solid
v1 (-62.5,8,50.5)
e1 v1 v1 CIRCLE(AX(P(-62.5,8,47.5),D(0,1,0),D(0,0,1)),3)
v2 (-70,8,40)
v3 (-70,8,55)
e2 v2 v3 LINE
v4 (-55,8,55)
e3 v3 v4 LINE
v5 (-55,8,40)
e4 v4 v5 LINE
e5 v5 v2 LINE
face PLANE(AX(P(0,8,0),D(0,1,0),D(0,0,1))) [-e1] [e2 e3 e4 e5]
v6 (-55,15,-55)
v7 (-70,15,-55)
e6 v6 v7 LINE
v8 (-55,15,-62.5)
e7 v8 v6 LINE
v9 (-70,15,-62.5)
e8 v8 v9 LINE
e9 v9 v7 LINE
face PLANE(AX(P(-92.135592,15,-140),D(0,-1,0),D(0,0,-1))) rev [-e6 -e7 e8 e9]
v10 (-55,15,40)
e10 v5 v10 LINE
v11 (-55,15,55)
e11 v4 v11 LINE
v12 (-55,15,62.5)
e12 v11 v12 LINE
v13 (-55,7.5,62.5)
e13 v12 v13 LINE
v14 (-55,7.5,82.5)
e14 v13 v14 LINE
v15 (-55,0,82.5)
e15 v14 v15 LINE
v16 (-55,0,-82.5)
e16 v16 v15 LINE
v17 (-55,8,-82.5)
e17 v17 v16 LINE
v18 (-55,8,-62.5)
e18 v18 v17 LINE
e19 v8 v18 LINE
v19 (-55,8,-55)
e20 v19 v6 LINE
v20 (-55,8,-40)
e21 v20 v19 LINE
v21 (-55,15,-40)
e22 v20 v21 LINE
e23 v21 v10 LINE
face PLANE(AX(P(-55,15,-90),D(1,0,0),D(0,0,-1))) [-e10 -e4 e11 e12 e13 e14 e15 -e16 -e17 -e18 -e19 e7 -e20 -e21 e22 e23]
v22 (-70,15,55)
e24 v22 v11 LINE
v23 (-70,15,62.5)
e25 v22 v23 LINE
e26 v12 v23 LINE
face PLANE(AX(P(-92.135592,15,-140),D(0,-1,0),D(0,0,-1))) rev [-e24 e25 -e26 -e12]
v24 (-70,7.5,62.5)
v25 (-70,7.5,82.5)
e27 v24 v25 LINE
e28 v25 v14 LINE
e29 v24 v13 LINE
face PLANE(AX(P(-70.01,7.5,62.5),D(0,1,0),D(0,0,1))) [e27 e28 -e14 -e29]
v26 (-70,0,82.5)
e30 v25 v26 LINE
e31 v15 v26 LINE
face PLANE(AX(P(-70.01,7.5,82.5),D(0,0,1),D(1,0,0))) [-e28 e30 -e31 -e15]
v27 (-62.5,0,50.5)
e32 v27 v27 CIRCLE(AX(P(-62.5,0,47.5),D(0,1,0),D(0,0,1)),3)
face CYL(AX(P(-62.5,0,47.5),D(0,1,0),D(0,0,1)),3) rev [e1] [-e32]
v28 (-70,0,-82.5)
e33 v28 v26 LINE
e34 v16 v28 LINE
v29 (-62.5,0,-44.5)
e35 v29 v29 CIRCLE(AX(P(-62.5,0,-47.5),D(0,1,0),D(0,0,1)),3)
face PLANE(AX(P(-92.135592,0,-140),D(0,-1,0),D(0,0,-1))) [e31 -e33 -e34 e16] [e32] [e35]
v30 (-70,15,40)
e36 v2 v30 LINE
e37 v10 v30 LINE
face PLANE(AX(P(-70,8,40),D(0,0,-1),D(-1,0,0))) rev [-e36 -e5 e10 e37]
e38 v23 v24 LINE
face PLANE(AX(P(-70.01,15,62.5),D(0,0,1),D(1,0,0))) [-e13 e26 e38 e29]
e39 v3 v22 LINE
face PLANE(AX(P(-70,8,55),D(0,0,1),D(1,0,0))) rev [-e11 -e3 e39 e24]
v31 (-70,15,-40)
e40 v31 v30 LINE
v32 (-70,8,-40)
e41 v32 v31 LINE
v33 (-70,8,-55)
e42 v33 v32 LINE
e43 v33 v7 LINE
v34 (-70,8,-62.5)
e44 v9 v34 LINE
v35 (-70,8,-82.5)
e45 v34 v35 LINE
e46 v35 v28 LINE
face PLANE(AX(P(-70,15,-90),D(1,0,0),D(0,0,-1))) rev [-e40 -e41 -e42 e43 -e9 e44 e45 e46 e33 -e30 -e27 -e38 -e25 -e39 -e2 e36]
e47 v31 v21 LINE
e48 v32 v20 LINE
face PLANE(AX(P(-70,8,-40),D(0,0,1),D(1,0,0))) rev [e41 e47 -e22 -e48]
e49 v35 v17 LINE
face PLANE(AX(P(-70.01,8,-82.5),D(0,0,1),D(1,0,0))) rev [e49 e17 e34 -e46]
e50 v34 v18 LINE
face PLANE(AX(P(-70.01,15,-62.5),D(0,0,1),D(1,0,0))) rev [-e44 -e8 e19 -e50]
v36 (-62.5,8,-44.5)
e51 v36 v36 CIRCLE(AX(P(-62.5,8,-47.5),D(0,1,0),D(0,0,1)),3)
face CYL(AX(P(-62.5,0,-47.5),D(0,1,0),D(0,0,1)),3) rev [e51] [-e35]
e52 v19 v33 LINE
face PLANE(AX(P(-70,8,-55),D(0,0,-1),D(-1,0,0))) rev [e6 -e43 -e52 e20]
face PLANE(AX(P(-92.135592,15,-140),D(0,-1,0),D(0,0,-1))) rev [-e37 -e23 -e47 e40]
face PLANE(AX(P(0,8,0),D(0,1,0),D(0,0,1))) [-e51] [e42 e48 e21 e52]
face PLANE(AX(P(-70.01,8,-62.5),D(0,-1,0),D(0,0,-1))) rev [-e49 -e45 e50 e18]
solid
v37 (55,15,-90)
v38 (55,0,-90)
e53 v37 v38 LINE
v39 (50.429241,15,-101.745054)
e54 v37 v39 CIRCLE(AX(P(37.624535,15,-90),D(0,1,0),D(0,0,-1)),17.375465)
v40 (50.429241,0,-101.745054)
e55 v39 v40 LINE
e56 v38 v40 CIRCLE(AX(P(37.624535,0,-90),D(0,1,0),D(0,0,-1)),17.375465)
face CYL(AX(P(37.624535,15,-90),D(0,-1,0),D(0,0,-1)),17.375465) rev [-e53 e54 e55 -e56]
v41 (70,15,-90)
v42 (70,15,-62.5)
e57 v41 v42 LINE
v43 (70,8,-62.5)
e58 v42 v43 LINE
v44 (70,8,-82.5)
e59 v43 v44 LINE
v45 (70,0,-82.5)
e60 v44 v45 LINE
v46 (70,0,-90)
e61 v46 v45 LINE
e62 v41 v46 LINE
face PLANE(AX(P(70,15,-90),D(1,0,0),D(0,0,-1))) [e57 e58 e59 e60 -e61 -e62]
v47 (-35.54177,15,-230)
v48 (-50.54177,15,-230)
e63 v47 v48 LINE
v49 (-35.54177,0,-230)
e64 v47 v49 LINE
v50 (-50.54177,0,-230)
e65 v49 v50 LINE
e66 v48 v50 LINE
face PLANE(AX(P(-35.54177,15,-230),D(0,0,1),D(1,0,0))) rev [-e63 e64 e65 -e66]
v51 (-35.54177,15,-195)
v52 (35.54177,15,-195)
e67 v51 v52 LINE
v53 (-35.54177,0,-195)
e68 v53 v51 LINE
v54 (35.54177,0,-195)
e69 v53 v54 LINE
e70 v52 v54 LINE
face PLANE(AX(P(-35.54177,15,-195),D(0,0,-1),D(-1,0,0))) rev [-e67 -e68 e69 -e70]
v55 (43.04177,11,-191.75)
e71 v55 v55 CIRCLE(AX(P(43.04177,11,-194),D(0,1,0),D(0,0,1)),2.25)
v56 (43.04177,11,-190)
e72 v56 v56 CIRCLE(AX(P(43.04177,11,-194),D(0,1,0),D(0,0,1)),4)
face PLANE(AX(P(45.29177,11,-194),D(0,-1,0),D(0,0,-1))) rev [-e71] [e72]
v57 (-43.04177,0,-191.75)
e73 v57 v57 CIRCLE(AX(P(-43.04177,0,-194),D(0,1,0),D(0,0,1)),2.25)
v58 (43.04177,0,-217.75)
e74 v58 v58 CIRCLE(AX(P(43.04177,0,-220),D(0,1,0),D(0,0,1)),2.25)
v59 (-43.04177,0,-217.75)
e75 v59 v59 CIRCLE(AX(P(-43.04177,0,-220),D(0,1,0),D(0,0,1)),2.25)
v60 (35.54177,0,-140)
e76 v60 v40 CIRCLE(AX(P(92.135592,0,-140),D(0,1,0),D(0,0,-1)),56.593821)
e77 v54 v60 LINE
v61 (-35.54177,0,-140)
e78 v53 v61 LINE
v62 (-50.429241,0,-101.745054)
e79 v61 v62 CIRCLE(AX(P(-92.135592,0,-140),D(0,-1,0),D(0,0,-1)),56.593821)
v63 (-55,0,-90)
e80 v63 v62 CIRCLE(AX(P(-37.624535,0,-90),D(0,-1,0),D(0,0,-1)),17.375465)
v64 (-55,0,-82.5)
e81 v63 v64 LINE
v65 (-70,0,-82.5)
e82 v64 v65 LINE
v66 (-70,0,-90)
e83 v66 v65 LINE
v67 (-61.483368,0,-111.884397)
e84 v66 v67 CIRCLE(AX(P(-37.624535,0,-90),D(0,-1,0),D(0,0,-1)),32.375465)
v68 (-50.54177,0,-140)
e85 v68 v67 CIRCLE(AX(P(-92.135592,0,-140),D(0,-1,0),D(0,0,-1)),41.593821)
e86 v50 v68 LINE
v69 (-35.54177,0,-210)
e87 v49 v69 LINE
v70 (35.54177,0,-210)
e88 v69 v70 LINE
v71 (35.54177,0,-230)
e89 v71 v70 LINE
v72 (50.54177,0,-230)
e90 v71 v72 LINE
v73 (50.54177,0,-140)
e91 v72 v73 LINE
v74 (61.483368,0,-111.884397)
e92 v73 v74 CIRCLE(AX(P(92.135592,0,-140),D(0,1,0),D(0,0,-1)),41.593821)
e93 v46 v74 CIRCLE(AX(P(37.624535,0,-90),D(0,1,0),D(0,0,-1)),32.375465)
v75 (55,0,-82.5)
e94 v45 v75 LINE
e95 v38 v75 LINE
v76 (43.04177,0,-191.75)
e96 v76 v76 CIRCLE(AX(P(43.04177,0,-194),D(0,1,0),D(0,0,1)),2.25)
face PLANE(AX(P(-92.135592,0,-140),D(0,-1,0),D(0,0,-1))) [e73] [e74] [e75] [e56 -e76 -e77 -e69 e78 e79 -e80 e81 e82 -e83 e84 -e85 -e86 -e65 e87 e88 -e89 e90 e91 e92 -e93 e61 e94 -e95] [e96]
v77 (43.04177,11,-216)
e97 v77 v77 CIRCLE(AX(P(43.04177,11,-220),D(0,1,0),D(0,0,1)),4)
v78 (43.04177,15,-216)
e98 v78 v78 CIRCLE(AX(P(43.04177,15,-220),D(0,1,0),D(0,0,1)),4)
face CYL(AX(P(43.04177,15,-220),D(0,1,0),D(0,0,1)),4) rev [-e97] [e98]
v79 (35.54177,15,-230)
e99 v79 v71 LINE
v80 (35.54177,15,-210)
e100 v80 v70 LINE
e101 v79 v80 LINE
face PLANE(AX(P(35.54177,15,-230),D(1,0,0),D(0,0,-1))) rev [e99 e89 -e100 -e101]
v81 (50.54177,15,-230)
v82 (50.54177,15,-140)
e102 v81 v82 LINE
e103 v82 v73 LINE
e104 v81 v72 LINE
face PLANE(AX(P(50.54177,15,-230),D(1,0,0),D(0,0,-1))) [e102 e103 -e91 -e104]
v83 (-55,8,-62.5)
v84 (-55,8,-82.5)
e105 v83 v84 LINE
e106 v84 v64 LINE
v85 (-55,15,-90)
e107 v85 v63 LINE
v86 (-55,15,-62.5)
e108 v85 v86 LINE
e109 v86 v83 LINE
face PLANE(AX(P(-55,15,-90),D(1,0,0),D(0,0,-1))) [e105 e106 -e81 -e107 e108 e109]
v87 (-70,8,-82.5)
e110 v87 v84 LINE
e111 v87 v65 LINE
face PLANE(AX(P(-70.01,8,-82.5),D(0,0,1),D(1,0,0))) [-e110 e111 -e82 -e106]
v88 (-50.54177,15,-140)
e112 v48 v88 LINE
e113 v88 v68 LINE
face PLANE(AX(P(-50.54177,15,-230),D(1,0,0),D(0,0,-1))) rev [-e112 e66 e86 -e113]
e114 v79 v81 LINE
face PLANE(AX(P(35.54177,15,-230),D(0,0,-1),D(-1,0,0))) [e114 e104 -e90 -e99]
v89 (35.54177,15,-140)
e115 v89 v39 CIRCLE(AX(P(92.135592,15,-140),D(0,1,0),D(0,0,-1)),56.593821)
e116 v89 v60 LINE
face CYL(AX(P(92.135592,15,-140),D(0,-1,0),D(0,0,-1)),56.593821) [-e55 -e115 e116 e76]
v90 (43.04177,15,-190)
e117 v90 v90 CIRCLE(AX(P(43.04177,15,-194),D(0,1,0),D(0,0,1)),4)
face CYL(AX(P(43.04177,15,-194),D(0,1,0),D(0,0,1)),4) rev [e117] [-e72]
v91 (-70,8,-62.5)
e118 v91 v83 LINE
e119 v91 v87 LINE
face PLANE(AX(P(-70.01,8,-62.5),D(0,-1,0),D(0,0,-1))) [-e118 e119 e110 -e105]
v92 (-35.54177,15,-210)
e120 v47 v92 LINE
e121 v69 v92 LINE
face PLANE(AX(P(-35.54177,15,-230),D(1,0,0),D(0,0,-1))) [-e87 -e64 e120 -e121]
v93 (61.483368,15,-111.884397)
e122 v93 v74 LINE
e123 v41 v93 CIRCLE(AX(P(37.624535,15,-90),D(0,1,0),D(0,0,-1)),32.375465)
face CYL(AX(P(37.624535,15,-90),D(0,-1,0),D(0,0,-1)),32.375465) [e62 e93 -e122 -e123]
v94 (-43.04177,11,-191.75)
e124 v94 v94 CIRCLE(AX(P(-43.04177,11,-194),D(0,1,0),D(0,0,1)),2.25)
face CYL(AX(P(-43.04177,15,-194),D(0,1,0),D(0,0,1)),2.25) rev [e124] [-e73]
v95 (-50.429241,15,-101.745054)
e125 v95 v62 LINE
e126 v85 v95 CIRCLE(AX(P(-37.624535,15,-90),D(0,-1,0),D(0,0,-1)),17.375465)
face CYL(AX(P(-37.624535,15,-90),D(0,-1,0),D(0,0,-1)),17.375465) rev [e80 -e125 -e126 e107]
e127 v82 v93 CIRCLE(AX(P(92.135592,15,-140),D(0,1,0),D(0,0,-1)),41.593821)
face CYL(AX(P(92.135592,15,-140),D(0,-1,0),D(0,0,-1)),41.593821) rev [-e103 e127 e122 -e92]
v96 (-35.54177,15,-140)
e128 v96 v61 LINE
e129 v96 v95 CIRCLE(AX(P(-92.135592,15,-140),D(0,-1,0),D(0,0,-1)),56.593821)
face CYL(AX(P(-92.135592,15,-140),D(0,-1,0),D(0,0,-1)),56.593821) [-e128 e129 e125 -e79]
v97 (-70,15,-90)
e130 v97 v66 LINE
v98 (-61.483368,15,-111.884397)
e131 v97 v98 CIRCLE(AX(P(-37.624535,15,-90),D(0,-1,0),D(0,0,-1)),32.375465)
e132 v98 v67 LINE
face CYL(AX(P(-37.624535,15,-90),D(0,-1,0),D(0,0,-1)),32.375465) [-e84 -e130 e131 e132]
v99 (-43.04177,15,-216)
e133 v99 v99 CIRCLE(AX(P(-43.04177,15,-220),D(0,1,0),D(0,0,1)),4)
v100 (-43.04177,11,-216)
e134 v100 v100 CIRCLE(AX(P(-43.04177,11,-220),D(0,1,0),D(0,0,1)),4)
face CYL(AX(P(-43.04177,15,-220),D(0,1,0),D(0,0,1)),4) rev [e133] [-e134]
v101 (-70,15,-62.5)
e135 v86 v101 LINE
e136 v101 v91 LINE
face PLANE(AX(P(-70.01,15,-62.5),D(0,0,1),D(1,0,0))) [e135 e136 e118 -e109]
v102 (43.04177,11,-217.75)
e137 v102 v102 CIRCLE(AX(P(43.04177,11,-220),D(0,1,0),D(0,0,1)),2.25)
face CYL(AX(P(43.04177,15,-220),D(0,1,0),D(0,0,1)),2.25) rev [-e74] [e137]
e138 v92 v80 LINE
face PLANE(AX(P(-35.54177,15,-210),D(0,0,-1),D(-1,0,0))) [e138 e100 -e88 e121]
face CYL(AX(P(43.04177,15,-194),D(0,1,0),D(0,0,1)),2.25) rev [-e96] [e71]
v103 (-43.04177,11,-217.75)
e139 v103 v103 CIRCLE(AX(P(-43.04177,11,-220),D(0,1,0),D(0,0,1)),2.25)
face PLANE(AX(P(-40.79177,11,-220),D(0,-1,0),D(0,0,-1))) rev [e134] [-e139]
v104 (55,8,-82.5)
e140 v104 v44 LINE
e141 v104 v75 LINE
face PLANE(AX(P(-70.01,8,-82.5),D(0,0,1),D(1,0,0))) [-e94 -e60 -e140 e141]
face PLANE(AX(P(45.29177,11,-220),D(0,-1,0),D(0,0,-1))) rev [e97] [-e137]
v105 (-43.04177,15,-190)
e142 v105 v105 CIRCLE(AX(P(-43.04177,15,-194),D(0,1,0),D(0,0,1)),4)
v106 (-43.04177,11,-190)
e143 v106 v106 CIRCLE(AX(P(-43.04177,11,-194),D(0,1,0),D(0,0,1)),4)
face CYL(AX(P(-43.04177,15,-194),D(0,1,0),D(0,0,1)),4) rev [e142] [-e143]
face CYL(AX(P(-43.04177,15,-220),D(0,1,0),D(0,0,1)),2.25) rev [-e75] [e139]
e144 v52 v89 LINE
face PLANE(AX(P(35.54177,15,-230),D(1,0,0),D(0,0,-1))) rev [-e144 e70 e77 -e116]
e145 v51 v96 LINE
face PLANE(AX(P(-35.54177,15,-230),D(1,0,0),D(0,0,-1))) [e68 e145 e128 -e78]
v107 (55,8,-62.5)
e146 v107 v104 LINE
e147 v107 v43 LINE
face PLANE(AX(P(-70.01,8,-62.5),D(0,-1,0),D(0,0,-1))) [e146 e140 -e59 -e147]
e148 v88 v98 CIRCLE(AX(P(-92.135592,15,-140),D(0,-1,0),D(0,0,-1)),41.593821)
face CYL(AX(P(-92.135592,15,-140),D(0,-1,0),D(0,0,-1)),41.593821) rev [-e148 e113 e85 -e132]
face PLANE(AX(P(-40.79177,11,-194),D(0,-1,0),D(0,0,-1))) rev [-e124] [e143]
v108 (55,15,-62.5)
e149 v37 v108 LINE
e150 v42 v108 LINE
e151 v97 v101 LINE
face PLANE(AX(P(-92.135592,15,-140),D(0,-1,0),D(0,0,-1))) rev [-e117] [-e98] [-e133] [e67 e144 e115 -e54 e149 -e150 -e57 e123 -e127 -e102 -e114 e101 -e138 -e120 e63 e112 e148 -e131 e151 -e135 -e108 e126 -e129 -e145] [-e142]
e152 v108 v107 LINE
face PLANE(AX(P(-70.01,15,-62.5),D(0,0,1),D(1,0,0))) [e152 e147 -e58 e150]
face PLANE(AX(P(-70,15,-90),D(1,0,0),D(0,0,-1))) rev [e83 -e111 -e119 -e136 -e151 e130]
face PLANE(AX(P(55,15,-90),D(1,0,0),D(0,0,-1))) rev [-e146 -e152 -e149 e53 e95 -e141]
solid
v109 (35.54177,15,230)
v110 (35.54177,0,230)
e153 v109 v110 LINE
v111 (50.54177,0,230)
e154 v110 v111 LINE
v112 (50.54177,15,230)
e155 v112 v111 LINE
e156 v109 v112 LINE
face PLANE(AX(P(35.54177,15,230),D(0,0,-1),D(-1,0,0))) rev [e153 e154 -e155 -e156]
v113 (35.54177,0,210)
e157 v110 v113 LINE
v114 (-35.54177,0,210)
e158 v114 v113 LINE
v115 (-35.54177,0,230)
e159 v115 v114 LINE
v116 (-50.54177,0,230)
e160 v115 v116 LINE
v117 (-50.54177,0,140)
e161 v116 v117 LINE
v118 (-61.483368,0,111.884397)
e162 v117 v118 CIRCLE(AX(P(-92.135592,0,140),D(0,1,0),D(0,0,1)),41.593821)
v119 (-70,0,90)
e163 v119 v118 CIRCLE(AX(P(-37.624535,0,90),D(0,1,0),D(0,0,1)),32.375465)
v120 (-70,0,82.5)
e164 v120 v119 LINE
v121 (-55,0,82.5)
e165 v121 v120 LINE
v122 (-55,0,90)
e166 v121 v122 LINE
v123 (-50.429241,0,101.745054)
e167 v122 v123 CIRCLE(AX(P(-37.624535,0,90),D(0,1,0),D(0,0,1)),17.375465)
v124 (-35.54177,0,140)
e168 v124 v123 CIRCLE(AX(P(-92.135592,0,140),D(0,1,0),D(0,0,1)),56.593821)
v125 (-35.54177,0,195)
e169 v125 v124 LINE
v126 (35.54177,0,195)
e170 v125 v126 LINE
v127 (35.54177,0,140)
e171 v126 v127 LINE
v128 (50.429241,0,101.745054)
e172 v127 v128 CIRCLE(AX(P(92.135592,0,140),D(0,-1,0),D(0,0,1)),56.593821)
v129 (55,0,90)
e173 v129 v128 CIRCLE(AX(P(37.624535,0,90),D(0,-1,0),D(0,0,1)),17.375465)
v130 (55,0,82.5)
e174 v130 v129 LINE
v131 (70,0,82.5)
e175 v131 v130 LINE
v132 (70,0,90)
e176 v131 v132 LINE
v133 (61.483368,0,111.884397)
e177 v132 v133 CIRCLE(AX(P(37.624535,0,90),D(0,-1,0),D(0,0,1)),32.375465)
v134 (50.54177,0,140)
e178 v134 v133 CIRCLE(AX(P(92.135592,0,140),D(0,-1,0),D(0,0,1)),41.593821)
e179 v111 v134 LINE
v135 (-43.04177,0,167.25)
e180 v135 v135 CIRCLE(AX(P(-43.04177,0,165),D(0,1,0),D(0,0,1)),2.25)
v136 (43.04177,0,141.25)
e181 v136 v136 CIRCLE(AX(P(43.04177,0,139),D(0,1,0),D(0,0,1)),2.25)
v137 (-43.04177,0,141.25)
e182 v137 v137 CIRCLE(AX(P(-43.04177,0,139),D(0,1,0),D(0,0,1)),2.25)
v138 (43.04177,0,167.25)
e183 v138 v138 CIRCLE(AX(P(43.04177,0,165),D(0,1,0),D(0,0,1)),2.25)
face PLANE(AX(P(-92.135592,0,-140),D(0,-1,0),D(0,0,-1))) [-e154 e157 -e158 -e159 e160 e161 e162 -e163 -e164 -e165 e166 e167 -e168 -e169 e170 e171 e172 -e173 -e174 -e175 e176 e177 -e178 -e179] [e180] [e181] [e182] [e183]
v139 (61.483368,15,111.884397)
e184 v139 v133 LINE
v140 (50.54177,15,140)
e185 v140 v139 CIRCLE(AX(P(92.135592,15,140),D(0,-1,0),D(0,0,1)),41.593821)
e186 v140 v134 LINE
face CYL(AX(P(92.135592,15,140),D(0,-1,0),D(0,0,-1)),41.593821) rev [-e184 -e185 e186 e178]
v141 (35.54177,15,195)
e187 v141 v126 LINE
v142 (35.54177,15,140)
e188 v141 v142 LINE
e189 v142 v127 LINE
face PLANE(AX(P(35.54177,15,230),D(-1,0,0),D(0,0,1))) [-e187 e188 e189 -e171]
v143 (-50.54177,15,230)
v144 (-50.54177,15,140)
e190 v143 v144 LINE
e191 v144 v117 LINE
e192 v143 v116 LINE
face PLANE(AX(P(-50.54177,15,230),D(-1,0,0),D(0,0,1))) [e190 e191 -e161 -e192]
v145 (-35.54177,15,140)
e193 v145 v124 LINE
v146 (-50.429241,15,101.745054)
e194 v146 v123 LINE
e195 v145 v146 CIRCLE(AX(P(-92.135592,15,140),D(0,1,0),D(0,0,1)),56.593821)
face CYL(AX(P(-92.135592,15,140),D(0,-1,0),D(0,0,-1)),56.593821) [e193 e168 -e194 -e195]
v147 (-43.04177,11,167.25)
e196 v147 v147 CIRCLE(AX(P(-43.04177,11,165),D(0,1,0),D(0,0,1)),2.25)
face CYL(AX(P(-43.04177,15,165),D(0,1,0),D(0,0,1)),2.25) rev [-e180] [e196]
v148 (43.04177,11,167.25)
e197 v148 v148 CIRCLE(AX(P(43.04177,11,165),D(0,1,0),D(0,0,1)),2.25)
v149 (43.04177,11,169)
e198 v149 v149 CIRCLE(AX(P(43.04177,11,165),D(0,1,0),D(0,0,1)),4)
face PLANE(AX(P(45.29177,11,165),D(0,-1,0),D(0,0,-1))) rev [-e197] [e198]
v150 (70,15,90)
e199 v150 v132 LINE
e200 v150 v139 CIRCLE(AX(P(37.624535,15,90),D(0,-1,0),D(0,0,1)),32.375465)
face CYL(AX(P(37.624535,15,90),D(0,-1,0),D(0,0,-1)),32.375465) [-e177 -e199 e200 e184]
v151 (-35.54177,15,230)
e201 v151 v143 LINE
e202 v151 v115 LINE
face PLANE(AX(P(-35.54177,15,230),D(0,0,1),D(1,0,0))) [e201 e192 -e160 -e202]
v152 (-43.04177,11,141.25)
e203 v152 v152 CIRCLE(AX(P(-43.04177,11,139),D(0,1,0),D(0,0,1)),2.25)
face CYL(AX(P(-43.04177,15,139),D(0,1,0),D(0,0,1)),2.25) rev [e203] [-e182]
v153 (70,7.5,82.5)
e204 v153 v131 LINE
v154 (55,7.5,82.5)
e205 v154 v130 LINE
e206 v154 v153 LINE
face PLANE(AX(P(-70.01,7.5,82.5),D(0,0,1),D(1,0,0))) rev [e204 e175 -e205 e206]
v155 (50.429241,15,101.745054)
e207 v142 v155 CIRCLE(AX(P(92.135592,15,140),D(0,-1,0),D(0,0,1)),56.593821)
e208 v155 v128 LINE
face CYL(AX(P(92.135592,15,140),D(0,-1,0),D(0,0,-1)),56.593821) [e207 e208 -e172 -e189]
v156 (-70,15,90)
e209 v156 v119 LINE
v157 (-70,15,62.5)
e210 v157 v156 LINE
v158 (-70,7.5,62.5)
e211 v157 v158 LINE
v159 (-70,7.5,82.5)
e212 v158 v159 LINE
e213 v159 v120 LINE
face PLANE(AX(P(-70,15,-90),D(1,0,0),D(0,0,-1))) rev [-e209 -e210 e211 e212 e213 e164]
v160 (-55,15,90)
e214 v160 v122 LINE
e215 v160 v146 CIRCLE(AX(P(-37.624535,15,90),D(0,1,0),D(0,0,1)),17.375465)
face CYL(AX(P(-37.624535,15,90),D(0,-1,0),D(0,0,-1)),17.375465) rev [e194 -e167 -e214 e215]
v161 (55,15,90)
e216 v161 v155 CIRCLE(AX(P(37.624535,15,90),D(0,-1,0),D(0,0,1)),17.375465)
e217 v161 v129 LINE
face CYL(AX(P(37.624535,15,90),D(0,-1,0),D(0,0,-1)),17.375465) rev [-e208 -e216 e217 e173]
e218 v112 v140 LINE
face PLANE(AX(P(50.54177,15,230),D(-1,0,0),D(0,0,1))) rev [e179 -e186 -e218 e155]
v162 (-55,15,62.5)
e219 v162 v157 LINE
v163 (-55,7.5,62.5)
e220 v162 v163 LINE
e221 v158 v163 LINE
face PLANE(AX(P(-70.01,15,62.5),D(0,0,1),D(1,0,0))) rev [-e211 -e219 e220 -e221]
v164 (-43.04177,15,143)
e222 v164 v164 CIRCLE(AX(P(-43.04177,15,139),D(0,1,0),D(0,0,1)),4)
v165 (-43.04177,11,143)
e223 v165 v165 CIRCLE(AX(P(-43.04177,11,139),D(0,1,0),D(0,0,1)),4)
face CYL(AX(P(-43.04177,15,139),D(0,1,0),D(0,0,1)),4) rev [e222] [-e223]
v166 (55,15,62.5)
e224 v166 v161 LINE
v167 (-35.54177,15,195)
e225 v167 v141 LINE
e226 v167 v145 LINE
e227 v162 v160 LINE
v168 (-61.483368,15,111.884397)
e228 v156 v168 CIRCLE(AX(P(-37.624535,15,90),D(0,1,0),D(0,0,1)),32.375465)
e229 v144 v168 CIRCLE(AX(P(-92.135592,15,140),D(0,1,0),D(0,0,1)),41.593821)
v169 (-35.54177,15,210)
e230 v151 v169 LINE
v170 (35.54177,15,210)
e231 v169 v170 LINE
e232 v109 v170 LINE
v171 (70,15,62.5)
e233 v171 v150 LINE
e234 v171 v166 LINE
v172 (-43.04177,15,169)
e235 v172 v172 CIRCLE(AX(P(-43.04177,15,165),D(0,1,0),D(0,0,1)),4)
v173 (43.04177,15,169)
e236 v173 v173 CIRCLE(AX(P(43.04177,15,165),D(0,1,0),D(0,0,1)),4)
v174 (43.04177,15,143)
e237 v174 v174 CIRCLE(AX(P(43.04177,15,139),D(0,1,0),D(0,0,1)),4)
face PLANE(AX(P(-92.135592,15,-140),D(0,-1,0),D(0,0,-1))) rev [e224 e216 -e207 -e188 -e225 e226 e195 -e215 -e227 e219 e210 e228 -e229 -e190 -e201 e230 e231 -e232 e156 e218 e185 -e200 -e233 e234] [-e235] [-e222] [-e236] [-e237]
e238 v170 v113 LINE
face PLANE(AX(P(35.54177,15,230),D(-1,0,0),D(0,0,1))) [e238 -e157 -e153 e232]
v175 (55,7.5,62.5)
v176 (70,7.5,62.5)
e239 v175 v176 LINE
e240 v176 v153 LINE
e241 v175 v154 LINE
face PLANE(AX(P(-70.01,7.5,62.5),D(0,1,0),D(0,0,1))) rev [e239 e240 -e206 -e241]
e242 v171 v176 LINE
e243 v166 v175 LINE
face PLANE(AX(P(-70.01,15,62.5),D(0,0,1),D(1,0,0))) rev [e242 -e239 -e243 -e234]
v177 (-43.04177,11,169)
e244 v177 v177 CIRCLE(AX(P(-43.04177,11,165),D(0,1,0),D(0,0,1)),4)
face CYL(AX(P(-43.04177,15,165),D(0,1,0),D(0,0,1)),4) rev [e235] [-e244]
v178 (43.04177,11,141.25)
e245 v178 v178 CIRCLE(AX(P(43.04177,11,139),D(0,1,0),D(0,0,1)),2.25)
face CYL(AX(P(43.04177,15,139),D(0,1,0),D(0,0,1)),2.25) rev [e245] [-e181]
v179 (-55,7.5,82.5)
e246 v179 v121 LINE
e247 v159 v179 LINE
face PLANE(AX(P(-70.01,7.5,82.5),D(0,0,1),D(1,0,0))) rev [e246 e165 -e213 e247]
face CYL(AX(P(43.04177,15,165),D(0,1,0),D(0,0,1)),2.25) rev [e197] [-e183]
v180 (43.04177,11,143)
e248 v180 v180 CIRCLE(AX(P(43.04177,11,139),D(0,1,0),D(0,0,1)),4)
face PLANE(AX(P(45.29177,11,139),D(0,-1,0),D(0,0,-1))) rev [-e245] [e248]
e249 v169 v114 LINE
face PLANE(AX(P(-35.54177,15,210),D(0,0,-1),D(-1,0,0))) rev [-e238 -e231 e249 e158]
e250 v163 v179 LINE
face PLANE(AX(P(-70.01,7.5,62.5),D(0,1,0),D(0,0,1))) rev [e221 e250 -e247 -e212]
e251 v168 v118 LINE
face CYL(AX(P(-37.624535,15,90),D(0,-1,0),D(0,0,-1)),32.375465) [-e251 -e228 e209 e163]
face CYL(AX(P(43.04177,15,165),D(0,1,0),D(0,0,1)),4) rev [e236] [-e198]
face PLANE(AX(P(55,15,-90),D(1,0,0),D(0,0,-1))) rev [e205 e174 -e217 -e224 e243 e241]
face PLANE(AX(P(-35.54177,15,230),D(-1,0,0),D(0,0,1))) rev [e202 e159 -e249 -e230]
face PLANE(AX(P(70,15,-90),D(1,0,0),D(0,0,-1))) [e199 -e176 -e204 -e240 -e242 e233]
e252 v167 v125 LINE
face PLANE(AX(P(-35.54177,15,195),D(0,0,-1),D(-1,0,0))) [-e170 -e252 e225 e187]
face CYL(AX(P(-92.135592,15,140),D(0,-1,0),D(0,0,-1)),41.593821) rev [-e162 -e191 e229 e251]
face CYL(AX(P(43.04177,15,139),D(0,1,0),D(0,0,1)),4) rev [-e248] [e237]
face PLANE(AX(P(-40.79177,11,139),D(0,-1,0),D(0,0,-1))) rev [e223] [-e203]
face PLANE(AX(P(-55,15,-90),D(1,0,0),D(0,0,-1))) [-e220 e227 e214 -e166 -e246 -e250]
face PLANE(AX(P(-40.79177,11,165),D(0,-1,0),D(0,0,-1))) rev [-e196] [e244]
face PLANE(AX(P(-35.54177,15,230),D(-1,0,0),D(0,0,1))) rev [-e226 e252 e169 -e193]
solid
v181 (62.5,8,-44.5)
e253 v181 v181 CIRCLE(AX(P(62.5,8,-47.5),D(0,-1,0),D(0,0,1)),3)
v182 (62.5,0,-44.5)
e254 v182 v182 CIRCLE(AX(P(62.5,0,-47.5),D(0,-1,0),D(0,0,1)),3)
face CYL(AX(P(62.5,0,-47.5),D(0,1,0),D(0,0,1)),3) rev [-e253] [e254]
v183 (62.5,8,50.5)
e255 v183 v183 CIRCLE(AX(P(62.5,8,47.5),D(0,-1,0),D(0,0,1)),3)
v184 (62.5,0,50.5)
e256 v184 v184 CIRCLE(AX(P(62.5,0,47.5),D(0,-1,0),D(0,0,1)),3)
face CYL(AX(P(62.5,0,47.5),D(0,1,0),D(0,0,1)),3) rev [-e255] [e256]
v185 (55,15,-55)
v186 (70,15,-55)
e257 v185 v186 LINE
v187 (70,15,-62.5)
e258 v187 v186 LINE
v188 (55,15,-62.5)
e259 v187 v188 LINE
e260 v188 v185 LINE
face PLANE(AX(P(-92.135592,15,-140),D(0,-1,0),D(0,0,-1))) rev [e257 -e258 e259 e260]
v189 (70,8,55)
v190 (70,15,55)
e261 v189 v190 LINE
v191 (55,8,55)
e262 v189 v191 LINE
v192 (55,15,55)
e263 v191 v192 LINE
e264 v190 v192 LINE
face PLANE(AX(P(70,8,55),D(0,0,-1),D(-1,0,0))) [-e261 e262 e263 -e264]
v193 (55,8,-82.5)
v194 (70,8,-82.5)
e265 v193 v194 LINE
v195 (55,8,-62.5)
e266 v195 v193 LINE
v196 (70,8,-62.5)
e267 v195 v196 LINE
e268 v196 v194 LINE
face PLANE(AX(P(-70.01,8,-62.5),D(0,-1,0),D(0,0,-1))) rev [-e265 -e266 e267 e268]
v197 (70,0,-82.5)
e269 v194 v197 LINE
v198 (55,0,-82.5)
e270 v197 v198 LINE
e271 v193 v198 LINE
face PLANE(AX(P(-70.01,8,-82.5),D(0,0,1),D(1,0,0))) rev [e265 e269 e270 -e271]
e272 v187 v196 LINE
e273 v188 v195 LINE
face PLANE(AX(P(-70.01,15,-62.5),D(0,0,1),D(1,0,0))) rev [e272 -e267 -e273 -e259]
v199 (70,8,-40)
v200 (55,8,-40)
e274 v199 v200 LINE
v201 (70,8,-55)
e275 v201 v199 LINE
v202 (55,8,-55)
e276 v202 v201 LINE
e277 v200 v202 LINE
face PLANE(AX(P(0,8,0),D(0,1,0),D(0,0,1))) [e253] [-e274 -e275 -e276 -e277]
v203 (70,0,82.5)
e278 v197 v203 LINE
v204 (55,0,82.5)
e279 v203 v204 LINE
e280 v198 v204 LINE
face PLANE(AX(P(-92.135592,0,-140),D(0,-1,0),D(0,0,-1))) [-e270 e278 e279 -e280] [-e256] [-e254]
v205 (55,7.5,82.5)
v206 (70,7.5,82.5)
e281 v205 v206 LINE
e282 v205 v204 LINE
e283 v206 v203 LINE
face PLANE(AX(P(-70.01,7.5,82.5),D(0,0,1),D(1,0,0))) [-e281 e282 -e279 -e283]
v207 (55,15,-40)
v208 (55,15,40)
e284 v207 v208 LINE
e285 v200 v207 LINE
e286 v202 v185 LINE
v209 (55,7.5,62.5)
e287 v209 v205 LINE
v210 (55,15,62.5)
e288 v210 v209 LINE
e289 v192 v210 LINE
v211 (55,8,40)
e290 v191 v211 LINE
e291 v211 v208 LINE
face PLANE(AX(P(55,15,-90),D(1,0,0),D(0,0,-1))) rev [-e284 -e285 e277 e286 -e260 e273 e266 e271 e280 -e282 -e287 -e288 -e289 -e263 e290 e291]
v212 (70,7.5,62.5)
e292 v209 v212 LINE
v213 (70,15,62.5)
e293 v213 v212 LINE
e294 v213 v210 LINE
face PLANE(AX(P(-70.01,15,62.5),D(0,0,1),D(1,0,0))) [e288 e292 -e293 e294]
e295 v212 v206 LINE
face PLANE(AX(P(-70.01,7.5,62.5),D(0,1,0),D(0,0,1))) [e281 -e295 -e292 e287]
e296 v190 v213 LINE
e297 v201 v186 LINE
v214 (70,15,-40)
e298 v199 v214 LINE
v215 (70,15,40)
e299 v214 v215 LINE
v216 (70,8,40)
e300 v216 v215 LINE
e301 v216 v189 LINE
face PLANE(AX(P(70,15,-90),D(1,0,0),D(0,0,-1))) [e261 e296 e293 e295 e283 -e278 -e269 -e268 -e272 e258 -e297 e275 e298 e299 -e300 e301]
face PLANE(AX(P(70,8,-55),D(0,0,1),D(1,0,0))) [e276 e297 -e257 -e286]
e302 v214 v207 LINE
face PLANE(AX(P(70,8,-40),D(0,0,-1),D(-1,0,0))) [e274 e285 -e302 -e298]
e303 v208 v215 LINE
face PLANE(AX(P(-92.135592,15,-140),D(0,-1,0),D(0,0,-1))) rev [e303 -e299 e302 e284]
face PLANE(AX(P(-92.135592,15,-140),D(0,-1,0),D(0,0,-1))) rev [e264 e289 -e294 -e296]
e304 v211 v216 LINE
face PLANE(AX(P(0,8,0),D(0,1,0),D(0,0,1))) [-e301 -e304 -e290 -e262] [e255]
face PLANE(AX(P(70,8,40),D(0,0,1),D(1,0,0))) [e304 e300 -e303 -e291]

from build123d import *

# Parameters (mm, degrees)
SKETCH1_W                                  = 35.541770457
SKETCH1_H                                  = 15
BOSS_EXTRUDE1_DEPTH                        = 15
MIRROR2_AT_THE_SECOND_PLANE_COPY_1_SKETC_W = 35.541770457
MIRROR2_AT_THE_SECOND_PLANE_COPY_1_SKETC_H = 15
MIRROR2_AT_THE_SECOND_PLANE_COPY_1_DEPTH   = 15
CBORE_FOR_M4_SHCS1_D                       = 4.5
CBORE_FOR_M4_SHCS1_CBORE_D                 = 8
CBORE_FOR_M4_SHCS1_CBORE_DEPTH             = 4
SKETCH7_W                                  = 15
SKETCH7_H                                  = 15
CUT_EXTRUDE1_DEPTH                         = 7
SKETCH8_R                                  = 3
CUT_EXTRUDE2_DEPTH                         = 241.549371232
SPLIT1_START                               = -62.5
SPLIT1_OUTLINE_W                           = 140
SPLIT1_OUTLINE_H                           = 15
SPLIT1_DEPTH                               = 292.5
SPLIT1_START_2                             = -82.5
SPLIT1_2_OUTLINE_W                         = 15
SPLIT1_2_OUTLINE_H                         = 8
SPLIT1_2_DEPTH                             = 20
SPLIT1_3_OUTLINE_W                         = 15
SPLIT1_3_OUTLINE_H                         = 7.5
SPLIT1_3_OUTLINE_H_2                       = 80
SPLIT1_3_DEPTH                             = 15
SPLIT1_4_OUTLINE_W                         = 15
SPLIT1_4_OUTLINE_H                         = 20
SPLIT1_4_OUTLINE_H_2                       = 15
SPLIT1_4_OUTLINE_R                         = 3
SPLIT1_4_DEPTH                             = 7.5
SPLIT1_START_3                             = 7.5
SPLIT1_5_OUTLINE_W                         = 15
SPLIT1_5_OUTLINE_H                         = 20
SPLIT1_5_OUTLINE_H_2                       = 15
SPLIT1_5_OUTLINE_R                         = 3
SPLIT1_5_DEPTH                             = 0.5
SPLIT1_6_OUTLINE_W                         = 15
SPLIT1_6_OUTLINE_H                         = 7.5
SPLIT1_6_OUTLINE_H_2                       = 80
SPLIT1_6_DEPTH                             = 15
SPLIT1_7_OUTLINE_W                         = 15
SPLIT1_7_OUTLINE_H                         = 20
SPLIT1_7_OUTLINE_H_2                       = 15
SPLIT1_7_OUTLINE_R                         = 3
SPLIT1_7_DEPTH                             = 7.5
SPLIT1_8_OUTLINE_W                         = 15
SPLIT1_8_OUTLINE_H                         = 20
SPLIT1_8_OUTLINE_H_2                       = 15
SPLIT1_8_OUTLINE_R                         = 3
SPLIT1_8_DEPTH                             = 0.5
SPLIT1_9_OUTLINE_R                         = 4
SPLIT1_9_DEPTH                             = 15
SPLIT1_10_OUTLINE_W                        = 15
SPLIT1_10_OUTLINE_H                        = 20
SPLIT1_10_DEPTH                            = 7.5
SPLIT1_11_OUTLINE_R                        = 4
SPLIT1_11_OUTLINE_R_2                      = 2.25
SPLIT1_11_DEPTH                            = 11


# Read off the part's stored shape, not the designer's step: Split1
with BuildPart() as part:
    # Sketch1 → Boss-Extrude1 (new body)
    with BuildSketch(Plane(origin=(0, 0, 0), x_dir=(1, 0, 0), z_dir=(0, 1, 0))):
        with BuildLine():
            Line((-35.541770457, 230), (-35.541770457, 140))
            ThreePointArc((-35.541770457, 140), (-39.394799327, 119.475151066), (-50.429240982, 101.7450537))
            ThreePointArc((-50.429240982, 101.7450537), (-53.817041053, 96.301549897), (-55, 90))
            Line((-55, 90), (-55, 0))
            Line((-55, 0), (-70, 0))
            Line((-70, 0), (-70, 90))
            ThreePointArc((-70, 90), (-67.795808847, 101.741591346), (-61.48336752, 111.884397194))
            ThreePointArc((-61.48336752, 111.884397194), (-53.373567121, 124.915192515), (-50.541770457, 140))
            Line((-50.541770457, 140), (-50.541770457, 230))
            Line((-50.541770457, 230), (-35.541770457, 230))
        make_face()
        with Locations((-17.770885229, 202.5)):
            Rectangle(SKETCH1_W, SKETCH1_H)
    boss_extrude1 = extrude(amount=BOSS_EXTRUDE1_DEPTH)

    # Mirror2 at the second plane: Boss-Extrude1 across plane
    add(boss_extrude1.mirror(Plane.XY))



with BuildPart() as mirror2_1:
    # Mirror2: Boss-Extrude1 across plane
    add(boss_extrude1.mirror(Plane(origin=(0, 0, 0), x_dir=(0, 0, 1), z_dir=(1, 0, 0))))


with BuildPart() as part_1:
    add(part.part)

    add(mirror2_1.part)  # Mirror2 at the second plane copy 1 merges Mirror2_1
    # Mirror2 at the second plane copy 1 sketc → Mirror2 at the second plane copy 1 (add)
    with BuildSketch(Plane(origin=(0, 0, 0), x_dir=(-1, 0, 0), z_dir=(0, 1, 0))):
        with BuildLine():
            Line((-35.541770457, 230), (-35.541770457, 140))
            ThreePointArc((-35.541770457, 140), (-39.394799327, 119.475151066), (-50.429240982, 101.7450537))
            ThreePointArc((-50.429240982, 101.7450537), (-53.817041053, 96.301549897), (-55, 90))
            Line((-55, 90), (-55, 0))
            Line((-55, 0), (-70, 0))
            Line((-70, 0), (-70, 90))
            ThreePointArc((-70, 90), (-67.795808847, 101.741591346), (-61.48336752, 111.884397194))
            ThreePointArc((-61.48336752, 111.884397194), (-53.373567121, 124.915192515), (-50.541770457, 140))
            Line((-50.541770457, 140), (-50.541770457, 230))
            Line((-50.541770457, 230), (-35.541770457, 230))
        make_face()
        with Locations((-17.770885229, 202.5)):
            Rectangle(MIRROR2_AT_THE_SECOND_PLANE_COPY_1_SKETC_W, MIRROR2_AT_THE_SECOND_PLANE_COPY_1_SKETC_H)
    extrude(amount=MIRROR2_AT_THE_SECOND_PLANE_COPY_1_DEPTH)

    # CBORE for M4 SHCS1 (through all)
    with Locations(Plane(origin=(0, 15, 0), x_dir=(1, 0, 0), z_dir=(0, 1, 0))):
        with Locations((-43.041770457, 220), (-43.041770457, 194), (-43.041770457, -139), (-43.041770457, -165)):
            cbore_for_m4_shcs1 = CounterBoreHole(CBORE_FOR_M4_SHCS1_D / 2, CBORE_FOR_M4_SHCS1_CBORE_D / 2, CBORE_FOR_M4_SHCS1_CBORE_DEPTH)

    # Mirror3: CBORE for M4 SHCS1 across plane
    add(cbore_for_m4_shcs1.mirror(Plane(origin=(0, 0, 0), x_dir=(0, 0, 1), z_dir=(1, 0, 0))), mode=Mode.SUBTRACT)

    # Sketch7 → Cut-Extrude1 (cut)
    with BuildSketch(Plane(origin=(0, 15, 0), x_dir=(1, 0, 0), z_dir=(0, 1, 0))):
        with Locations((-62.5, 47.5)):
            Rectangle(SKETCH7_W, SKETCH7_H)
        with Locations((-62.5, -47.5)):
            Rectangle(SKETCH7_W, SKETCH7_H)
    cut_extrude1 = extrude(amount=-CUT_EXTRUDE1_DEPTH, mode=Mode.SUBTRACT)

    # Sketch8 → Cut-Extrude2 (cut, through all)
    with BuildSketch(Plane(origin=(0, 8, 0), x_dir=(1, 0, 0), z_dir=(0, 1, 0))):
        with Locations(Location((-62.5, 47.5, 0), (0, 0, 270))):
            Circle(SKETCH8_R)
        with Locations(Location((-62.5, -47.5, 0), (0, 0, 270))):
            Circle(SKETCH8_R)
    cut_extrude2 = extrude(amount=-CUT_EXTRUDE2_DEPTH, mode=Mode.SUBTRACT)

    # Mirror4: Cut-Extrude1, Cut-Extrude2 across plane
    add(cut_extrude1.mirror(Plane(origin=(0, 0, 0), x_dir=(0, 0, 1), z_dir=(1, 0, 0))), mode=Mode.SUBTRACT)
    add(cut_extrude2.mirror(Plane(origin=(0, 0, 0), x_dir=(0, 0, 1), z_dir=(1, 0, 0))), mode=Mode.SUBTRACT)

    # Split1 outline → Split1 (cut)
    with BuildSketch(Plane.XY.offset(SPLIT1_START)):
        with Locations((0, 7.5)):
            Rectangle(SPLIT1_OUTLINE_W, SPLIT1_OUTLINE_H)
    extrude(amount=SPLIT1_DEPTH, mode=Mode.SUBTRACT)

    # Split1 2 outline → Split1 2 (cut)
    with BuildSketch(Plane.XY.offset(SPLIT1_START_2)):
        with Locations((62.5, 4)):
            Rectangle(SPLIT1_2_OUTLINE_W, SPLIT1_2_OUTLINE_H)
        with Locations((-62.5, 4)):
            Rectangle(SPLIT1_2_OUTLINE_W, SPLIT1_2_OUTLINE_H)
    extrude(amount=SPLIT1_2_DEPTH, mode=Mode.SUBTRACT)


with BuildPart() as body_2:
    # Split1 3 outline → Split1 3 (new body)
    with BuildSketch(Plane(origin=(0, 0, 0), x_dir=(1, 0, 0), z_dir=(0, 1, 0))):
        with Locations((62.5, 58.75)):
            Rectangle(SPLIT1_3_OUTLINE_W, SPLIT1_3_OUTLINE_H)
        with Locations((62.5, 0)):
            Rectangle(SPLIT1_3_OUTLINE_W, SPLIT1_3_OUTLINE_H_2)
        with Locations((62.5, -58.75)):
            Rectangle(SPLIT1_3_OUTLINE_W, SPLIT1_3_OUTLINE_H)
    extrude(amount=SPLIT1_3_DEPTH)

    # Split1 4 outline → Split1 4 (add)
    # profile 1 of 4: a face of its own
    with BuildSketch(Plane(origin=(0, 0, 0), x_dir=(1, 0, 0), z_dir=(0, 1, 0))):
        with Locations((62.5, 72.5)):
            Rectangle(SPLIT1_4_OUTLINE_W, SPLIT1_4_OUTLINE_H)
    # profile 2 of 4: a face of its own
    with BuildSketch(Plane(origin=(0, 0, 0), x_dir=(1, 0, 0), z_dir=(0, 1, 0))):
        with Locations((62.5, 47.5)):
            Rectangle(SPLIT1_4_OUTLINE_W, SPLIT1_4_OUTLINE_H_2)
        with Locations((62.5, 47.5)):
            Circle(SPLIT1_4_OUTLINE_R, mode=Mode.SUBTRACT)
    # profile 3 of 4: a face of its own
    with BuildSketch(Plane(origin=(0, 0, 0), x_dir=(1, 0, 0), z_dir=(0, 1, 0))):
        with Locations((62.5, -47.5)):
            Rectangle(SPLIT1_4_OUTLINE_W, SPLIT1_4_OUTLINE_H_2)
        with Locations((62.5, -47.5)):
            Circle(SPLIT1_4_OUTLINE_R, mode=Mode.SUBTRACT)
    # profile 4 of 4: a face of its own
    with BuildSketch(Plane(origin=(0, 0, 0), x_dir=(1, 0, 0), z_dir=(0, 1, 0))):
        with Locations((62.5, -72.5)):
            Rectangle(SPLIT1_4_OUTLINE_W, SPLIT1_4_OUTLINE_H)
    extrude(amount=SPLIT1_4_DEPTH)

    # Split1 5 outline → Split1 5 (add)
    # profile 1 of 3: a face of its own
    with BuildSketch(Plane(origin=(0, 0, 0), x_dir=(1, 0, 0), z_dir=(0, 1, 0)).offset(SPLIT1_START_3)):
        with Locations((62.5, 72.5)):
            Rectangle(SPLIT1_5_OUTLINE_W, SPLIT1_5_OUTLINE_H)
    # profile 2 of 3: a face of its own
    with BuildSketch(Plane(origin=(0, 0, 0), x_dir=(1, 0, 0), z_dir=(0, 1, 0)).offset(SPLIT1_START_3)):
        with Locations((62.5, 47.5)):
            Rectangle(SPLIT1_5_OUTLINE_W, SPLIT1_5_OUTLINE_H_2)
        with Locations((62.5, 47.5)):
            Circle(SPLIT1_5_OUTLINE_R, mode=Mode.SUBTRACT)
    # profile 3 of 3: a face of its own
    with BuildSketch(Plane(origin=(0, 0, 0), x_dir=(1, 0, 0), z_dir=(0, 1, 0)).offset(SPLIT1_START_3)):
        with Locations((62.5, -47.5)):
            Rectangle(SPLIT1_5_OUTLINE_W, SPLIT1_5_OUTLINE_H_2)
        with Locations((62.5, -47.5)):
            Circle(SPLIT1_5_OUTLINE_R, mode=Mode.SUBTRACT)
    extrude(amount=SPLIT1_5_DEPTH)


with BuildPart() as body_3:
    # Split1 6 outline → Split1 6 (new body)
    with BuildSketch(Plane(origin=(0, 0, 0), x_dir=(1, 0, 0), z_dir=(0, 1, 0))):
        with Locations((-62.5, 58.75)):
            Rectangle(SPLIT1_6_OUTLINE_W, SPLIT1_6_OUTLINE_H)
        with Locations((-62.5, 0)):
            Rectangle(SPLIT1_6_OUTLINE_W, SPLIT1_6_OUTLINE_H_2)
        with Locations((-62.5, -58.75)):
            Rectangle(SPLIT1_6_OUTLINE_W, SPLIT1_6_OUTLINE_H)
    extrude(amount=SPLIT1_6_DEPTH)

    # Split1 7 outline → Split1 7 (add)
    # profile 1 of 4: a face of its own
    with BuildSketch(Plane(origin=(0, 0, 0), x_dir=(1, 0, 0), z_dir=(0, 1, 0))):
        with Locations((-62.5, 72.5)):
            Rectangle(SPLIT1_7_OUTLINE_W, SPLIT1_7_OUTLINE_H)
    # profile 2 of 4: a face of its own
    with BuildSketch(Plane(origin=(0, 0, 0), x_dir=(1, 0, 0), z_dir=(0, 1, 0))):
        with Locations((-62.5, 47.5)):
            Rectangle(SPLIT1_7_OUTLINE_W, SPLIT1_7_OUTLINE_H_2)
        with Locations((-62.5, 47.5)):
            Circle(SPLIT1_7_OUTLINE_R, mode=Mode.SUBTRACT)
    # profile 3 of 4: a face of its own
    with BuildSketch(Plane(origin=(0, 0, 0), x_dir=(1, 0, 0), z_dir=(0, 1, 0))):
        with Locations((-62.5, -47.5)):
            Rectangle(SPLIT1_7_OUTLINE_W, SPLIT1_7_OUTLINE_H_2)
        with Locations((-62.5, -47.5)):
            Circle(SPLIT1_7_OUTLINE_R, mode=Mode.SUBTRACT)
    # profile 4 of 4: a face of its own
    with BuildSketch(Plane(origin=(0, 0, 0), x_dir=(1, 0, 0), z_dir=(0, 1, 0))):
        with Locations((-62.5, -72.5)):
            Rectangle(SPLIT1_7_OUTLINE_W, SPLIT1_7_OUTLINE_H)
    extrude(amount=SPLIT1_7_DEPTH)

    # Split1 8 outline → Split1 8 (add)
    # profile 1 of 3: a face of its own
    with BuildSketch(Plane(origin=(0, 0, 0), x_dir=(1, 0, 0), z_dir=(0, 1, 0)).offset(SPLIT1_START_3)):
        with Locations((-62.5, 72.5)):
            Rectangle(SPLIT1_8_OUTLINE_W, SPLIT1_8_OUTLINE_H)
    # profile 2 of 3: a face of its own
    with BuildSketch(Plane(origin=(0, 0, 0), x_dir=(1, 0, 0), z_dir=(0, 1, 0)).offset(SPLIT1_START_3)):
        with Locations((-62.5, 47.5)):
            Rectangle(SPLIT1_8_OUTLINE_W, SPLIT1_8_OUTLINE_H_2)
        with Locations((-62.5, 47.5)):
            Circle(SPLIT1_8_OUTLINE_R, mode=Mode.SUBTRACT)
    # profile 3 of 3: a face of its own
    with BuildSketch(Plane(origin=(0, 0, 0), x_dir=(1, 0, 0), z_dir=(0, 1, 0)).offset(SPLIT1_START_3)):
        with Locations((-62.5, -47.5)):
            Rectangle(SPLIT1_8_OUTLINE_W, SPLIT1_8_OUTLINE_H_2)
        with Locations((-62.5, -47.5)):
            Circle(SPLIT1_8_OUTLINE_R, mode=Mode.SUBTRACT)
    extrude(amount=SPLIT1_8_DEPTH)


with BuildPart() as body_4:
    # Split1 9 outline → Split1 9 (new body)
    with BuildSketch(Plane(origin=(0, 0, 0), x_dir=(1, 0, 0), z_dir=(0, 1, 0))):
        with BuildLine():
            Line((70, -82.5), (55, -82.5))
            Line((55, -82.5), (55, -90))
            ThreePointArc((55, -90), (53.817041053, -96.301549897), (50.429240982, -101.7450537))
            ThreePointArc((50.429240982, -101.7450537), (39.394799327, -119.475151066), (35.541770457, -140))
            Line((35.541770457, -140), (35.541770457, -195))
            Line((35.541770457, -195), (-35.541770457, -195))
            Line((-35.541770457, -195), (-35.541770457, -140))
            ThreePointArc((-35.541770457, -140), (-39.394799327, -119.475151066), (-50.429240982, -101.7450537))
            ThreePointArc((-50.429240982, -101.7450537), (-53.817041053, -96.301549897), (-55, -90))
            Line((-55, -90), (-55, -82.5))
            Line((-55, -82.5), (-70, -82.5))
            Line((-70, -82.5), (-70, -90))
            ThreePointArc((-70, -90), (-67.795808847, -101.741591346), (-61.48336752, -111.884397194))
            ThreePointArc((-61.48336752, -111.884397194), (-53.373567121, -124.915192515), (-50.541770457, -140))
            Line((-50.541770457, -140), (-50.541770457, -230))
            Line((-50.541770457, -230), (-35.541770457, -230))
            Line((-35.541770457, -230), (-35.541770457, -210))
            Line((-35.541770457, -210), (35.541770457, -210))
            Line((35.541770457, -210), (35.541770457, -230))
            Line((35.541770457, -230), (50.541770457, -230))
            Line((50.541770457, -230), (50.541770457, -140))
            ThreePointArc((50.541770457, -140), (53.373567121, -124.915192515), (61.48336752, -111.884397194))
            ThreePointArc((61.48336752, -111.884397194), (67.795808847, -101.741591346), (70, -90))
            Line((70, -90), (70, -82.5))
        make_face()
        with Locations((-43.041770457, -165)):
            Circle(SPLIT1_9_OUTLINE_R, mode=Mode.SUBTRACT)
        with Locations((43.041770457, -165)):
            Circle(SPLIT1_9_OUTLINE_R, mode=Mode.SUBTRACT)
        with Locations((-43.041770457, -139)):
            Circle(SPLIT1_9_OUTLINE_R, mode=Mode.SUBTRACT)
        with Locations((43.041770457, -139)):
            Circle(SPLIT1_9_OUTLINE_R, mode=Mode.SUBTRACT)
    extrude(amount=SPLIT1_9_DEPTH)

    # Split1 10 outline → Split1 10 (add)
    with BuildSketch(Plane(origin=(0, 0, 0), x_dir=(1, 0, 0), z_dir=(0, 1, 0)).offset(SPLIT1_START_3)):
        with Locations((62.5, -72.5)):
            Rectangle(SPLIT1_10_OUTLINE_W, SPLIT1_10_OUTLINE_H)
        with Locations((-62.5, -72.5)):
            Rectangle(SPLIT1_10_OUTLINE_W, SPLIT1_10_OUTLINE_H)
    extrude(amount=SPLIT1_10_DEPTH)

    # Split1 11 outline → Split1 11 (add)
    # profile 1 of 4: a face of its own
    with BuildSketch(Plane(origin=(0, 0, 0), x_dir=(1, 0, 0), z_dir=(0, 1, 0))):
        with Locations((43.041770457, -139)):
            Circle(SPLIT1_11_OUTLINE_R)
        with Locations((43.041770457, -139)):
            Circle(SPLIT1_11_OUTLINE_R_2, mode=Mode.SUBTRACT)
    # profile 2 of 4: a face of its own
    with BuildSketch(Plane(origin=(0, 0, 0), x_dir=(1, 0, 0), z_dir=(0, 1, 0))):
        with Locations((-43.041770457, -165)):
            Circle(SPLIT1_11_OUTLINE_R)
        with Locations((-43.041770457, -165)):
            Circle(SPLIT1_11_OUTLINE_R_2, mode=Mode.SUBTRACT)
    # profile 3 of 4: a face of its own
    with BuildSketch(Plane(origin=(0, 0, 0), x_dir=(1, 0, 0), z_dir=(0, 1, 0))):
        with Locations((-43.041770457, -139)):
            Circle(SPLIT1_11_OUTLINE_R)
        with Locations((-43.041770457, -139)):
            Circle(SPLIT1_11_OUTLINE_R_2, mode=Mode.SUBTRACT)
    # profile 4 of 4: a face of its own
    with BuildSketch(Plane(origin=(0, 0, 0), x_dir=(1, 0, 0), z_dir=(0, 1, 0))):
        with Locations((43.041770457, -165)):
            Circle(SPLIT1_11_OUTLINE_R)
        with Locations((43.041770457, -165)):
            Circle(SPLIT1_11_OUTLINE_R_2, mode=Mode.SUBTRACT)
    extrude(amount=SPLIT1_11_DEPTH)


solid = Compound([part_1.part, body_2.part, body_3.part, body_4.part])
